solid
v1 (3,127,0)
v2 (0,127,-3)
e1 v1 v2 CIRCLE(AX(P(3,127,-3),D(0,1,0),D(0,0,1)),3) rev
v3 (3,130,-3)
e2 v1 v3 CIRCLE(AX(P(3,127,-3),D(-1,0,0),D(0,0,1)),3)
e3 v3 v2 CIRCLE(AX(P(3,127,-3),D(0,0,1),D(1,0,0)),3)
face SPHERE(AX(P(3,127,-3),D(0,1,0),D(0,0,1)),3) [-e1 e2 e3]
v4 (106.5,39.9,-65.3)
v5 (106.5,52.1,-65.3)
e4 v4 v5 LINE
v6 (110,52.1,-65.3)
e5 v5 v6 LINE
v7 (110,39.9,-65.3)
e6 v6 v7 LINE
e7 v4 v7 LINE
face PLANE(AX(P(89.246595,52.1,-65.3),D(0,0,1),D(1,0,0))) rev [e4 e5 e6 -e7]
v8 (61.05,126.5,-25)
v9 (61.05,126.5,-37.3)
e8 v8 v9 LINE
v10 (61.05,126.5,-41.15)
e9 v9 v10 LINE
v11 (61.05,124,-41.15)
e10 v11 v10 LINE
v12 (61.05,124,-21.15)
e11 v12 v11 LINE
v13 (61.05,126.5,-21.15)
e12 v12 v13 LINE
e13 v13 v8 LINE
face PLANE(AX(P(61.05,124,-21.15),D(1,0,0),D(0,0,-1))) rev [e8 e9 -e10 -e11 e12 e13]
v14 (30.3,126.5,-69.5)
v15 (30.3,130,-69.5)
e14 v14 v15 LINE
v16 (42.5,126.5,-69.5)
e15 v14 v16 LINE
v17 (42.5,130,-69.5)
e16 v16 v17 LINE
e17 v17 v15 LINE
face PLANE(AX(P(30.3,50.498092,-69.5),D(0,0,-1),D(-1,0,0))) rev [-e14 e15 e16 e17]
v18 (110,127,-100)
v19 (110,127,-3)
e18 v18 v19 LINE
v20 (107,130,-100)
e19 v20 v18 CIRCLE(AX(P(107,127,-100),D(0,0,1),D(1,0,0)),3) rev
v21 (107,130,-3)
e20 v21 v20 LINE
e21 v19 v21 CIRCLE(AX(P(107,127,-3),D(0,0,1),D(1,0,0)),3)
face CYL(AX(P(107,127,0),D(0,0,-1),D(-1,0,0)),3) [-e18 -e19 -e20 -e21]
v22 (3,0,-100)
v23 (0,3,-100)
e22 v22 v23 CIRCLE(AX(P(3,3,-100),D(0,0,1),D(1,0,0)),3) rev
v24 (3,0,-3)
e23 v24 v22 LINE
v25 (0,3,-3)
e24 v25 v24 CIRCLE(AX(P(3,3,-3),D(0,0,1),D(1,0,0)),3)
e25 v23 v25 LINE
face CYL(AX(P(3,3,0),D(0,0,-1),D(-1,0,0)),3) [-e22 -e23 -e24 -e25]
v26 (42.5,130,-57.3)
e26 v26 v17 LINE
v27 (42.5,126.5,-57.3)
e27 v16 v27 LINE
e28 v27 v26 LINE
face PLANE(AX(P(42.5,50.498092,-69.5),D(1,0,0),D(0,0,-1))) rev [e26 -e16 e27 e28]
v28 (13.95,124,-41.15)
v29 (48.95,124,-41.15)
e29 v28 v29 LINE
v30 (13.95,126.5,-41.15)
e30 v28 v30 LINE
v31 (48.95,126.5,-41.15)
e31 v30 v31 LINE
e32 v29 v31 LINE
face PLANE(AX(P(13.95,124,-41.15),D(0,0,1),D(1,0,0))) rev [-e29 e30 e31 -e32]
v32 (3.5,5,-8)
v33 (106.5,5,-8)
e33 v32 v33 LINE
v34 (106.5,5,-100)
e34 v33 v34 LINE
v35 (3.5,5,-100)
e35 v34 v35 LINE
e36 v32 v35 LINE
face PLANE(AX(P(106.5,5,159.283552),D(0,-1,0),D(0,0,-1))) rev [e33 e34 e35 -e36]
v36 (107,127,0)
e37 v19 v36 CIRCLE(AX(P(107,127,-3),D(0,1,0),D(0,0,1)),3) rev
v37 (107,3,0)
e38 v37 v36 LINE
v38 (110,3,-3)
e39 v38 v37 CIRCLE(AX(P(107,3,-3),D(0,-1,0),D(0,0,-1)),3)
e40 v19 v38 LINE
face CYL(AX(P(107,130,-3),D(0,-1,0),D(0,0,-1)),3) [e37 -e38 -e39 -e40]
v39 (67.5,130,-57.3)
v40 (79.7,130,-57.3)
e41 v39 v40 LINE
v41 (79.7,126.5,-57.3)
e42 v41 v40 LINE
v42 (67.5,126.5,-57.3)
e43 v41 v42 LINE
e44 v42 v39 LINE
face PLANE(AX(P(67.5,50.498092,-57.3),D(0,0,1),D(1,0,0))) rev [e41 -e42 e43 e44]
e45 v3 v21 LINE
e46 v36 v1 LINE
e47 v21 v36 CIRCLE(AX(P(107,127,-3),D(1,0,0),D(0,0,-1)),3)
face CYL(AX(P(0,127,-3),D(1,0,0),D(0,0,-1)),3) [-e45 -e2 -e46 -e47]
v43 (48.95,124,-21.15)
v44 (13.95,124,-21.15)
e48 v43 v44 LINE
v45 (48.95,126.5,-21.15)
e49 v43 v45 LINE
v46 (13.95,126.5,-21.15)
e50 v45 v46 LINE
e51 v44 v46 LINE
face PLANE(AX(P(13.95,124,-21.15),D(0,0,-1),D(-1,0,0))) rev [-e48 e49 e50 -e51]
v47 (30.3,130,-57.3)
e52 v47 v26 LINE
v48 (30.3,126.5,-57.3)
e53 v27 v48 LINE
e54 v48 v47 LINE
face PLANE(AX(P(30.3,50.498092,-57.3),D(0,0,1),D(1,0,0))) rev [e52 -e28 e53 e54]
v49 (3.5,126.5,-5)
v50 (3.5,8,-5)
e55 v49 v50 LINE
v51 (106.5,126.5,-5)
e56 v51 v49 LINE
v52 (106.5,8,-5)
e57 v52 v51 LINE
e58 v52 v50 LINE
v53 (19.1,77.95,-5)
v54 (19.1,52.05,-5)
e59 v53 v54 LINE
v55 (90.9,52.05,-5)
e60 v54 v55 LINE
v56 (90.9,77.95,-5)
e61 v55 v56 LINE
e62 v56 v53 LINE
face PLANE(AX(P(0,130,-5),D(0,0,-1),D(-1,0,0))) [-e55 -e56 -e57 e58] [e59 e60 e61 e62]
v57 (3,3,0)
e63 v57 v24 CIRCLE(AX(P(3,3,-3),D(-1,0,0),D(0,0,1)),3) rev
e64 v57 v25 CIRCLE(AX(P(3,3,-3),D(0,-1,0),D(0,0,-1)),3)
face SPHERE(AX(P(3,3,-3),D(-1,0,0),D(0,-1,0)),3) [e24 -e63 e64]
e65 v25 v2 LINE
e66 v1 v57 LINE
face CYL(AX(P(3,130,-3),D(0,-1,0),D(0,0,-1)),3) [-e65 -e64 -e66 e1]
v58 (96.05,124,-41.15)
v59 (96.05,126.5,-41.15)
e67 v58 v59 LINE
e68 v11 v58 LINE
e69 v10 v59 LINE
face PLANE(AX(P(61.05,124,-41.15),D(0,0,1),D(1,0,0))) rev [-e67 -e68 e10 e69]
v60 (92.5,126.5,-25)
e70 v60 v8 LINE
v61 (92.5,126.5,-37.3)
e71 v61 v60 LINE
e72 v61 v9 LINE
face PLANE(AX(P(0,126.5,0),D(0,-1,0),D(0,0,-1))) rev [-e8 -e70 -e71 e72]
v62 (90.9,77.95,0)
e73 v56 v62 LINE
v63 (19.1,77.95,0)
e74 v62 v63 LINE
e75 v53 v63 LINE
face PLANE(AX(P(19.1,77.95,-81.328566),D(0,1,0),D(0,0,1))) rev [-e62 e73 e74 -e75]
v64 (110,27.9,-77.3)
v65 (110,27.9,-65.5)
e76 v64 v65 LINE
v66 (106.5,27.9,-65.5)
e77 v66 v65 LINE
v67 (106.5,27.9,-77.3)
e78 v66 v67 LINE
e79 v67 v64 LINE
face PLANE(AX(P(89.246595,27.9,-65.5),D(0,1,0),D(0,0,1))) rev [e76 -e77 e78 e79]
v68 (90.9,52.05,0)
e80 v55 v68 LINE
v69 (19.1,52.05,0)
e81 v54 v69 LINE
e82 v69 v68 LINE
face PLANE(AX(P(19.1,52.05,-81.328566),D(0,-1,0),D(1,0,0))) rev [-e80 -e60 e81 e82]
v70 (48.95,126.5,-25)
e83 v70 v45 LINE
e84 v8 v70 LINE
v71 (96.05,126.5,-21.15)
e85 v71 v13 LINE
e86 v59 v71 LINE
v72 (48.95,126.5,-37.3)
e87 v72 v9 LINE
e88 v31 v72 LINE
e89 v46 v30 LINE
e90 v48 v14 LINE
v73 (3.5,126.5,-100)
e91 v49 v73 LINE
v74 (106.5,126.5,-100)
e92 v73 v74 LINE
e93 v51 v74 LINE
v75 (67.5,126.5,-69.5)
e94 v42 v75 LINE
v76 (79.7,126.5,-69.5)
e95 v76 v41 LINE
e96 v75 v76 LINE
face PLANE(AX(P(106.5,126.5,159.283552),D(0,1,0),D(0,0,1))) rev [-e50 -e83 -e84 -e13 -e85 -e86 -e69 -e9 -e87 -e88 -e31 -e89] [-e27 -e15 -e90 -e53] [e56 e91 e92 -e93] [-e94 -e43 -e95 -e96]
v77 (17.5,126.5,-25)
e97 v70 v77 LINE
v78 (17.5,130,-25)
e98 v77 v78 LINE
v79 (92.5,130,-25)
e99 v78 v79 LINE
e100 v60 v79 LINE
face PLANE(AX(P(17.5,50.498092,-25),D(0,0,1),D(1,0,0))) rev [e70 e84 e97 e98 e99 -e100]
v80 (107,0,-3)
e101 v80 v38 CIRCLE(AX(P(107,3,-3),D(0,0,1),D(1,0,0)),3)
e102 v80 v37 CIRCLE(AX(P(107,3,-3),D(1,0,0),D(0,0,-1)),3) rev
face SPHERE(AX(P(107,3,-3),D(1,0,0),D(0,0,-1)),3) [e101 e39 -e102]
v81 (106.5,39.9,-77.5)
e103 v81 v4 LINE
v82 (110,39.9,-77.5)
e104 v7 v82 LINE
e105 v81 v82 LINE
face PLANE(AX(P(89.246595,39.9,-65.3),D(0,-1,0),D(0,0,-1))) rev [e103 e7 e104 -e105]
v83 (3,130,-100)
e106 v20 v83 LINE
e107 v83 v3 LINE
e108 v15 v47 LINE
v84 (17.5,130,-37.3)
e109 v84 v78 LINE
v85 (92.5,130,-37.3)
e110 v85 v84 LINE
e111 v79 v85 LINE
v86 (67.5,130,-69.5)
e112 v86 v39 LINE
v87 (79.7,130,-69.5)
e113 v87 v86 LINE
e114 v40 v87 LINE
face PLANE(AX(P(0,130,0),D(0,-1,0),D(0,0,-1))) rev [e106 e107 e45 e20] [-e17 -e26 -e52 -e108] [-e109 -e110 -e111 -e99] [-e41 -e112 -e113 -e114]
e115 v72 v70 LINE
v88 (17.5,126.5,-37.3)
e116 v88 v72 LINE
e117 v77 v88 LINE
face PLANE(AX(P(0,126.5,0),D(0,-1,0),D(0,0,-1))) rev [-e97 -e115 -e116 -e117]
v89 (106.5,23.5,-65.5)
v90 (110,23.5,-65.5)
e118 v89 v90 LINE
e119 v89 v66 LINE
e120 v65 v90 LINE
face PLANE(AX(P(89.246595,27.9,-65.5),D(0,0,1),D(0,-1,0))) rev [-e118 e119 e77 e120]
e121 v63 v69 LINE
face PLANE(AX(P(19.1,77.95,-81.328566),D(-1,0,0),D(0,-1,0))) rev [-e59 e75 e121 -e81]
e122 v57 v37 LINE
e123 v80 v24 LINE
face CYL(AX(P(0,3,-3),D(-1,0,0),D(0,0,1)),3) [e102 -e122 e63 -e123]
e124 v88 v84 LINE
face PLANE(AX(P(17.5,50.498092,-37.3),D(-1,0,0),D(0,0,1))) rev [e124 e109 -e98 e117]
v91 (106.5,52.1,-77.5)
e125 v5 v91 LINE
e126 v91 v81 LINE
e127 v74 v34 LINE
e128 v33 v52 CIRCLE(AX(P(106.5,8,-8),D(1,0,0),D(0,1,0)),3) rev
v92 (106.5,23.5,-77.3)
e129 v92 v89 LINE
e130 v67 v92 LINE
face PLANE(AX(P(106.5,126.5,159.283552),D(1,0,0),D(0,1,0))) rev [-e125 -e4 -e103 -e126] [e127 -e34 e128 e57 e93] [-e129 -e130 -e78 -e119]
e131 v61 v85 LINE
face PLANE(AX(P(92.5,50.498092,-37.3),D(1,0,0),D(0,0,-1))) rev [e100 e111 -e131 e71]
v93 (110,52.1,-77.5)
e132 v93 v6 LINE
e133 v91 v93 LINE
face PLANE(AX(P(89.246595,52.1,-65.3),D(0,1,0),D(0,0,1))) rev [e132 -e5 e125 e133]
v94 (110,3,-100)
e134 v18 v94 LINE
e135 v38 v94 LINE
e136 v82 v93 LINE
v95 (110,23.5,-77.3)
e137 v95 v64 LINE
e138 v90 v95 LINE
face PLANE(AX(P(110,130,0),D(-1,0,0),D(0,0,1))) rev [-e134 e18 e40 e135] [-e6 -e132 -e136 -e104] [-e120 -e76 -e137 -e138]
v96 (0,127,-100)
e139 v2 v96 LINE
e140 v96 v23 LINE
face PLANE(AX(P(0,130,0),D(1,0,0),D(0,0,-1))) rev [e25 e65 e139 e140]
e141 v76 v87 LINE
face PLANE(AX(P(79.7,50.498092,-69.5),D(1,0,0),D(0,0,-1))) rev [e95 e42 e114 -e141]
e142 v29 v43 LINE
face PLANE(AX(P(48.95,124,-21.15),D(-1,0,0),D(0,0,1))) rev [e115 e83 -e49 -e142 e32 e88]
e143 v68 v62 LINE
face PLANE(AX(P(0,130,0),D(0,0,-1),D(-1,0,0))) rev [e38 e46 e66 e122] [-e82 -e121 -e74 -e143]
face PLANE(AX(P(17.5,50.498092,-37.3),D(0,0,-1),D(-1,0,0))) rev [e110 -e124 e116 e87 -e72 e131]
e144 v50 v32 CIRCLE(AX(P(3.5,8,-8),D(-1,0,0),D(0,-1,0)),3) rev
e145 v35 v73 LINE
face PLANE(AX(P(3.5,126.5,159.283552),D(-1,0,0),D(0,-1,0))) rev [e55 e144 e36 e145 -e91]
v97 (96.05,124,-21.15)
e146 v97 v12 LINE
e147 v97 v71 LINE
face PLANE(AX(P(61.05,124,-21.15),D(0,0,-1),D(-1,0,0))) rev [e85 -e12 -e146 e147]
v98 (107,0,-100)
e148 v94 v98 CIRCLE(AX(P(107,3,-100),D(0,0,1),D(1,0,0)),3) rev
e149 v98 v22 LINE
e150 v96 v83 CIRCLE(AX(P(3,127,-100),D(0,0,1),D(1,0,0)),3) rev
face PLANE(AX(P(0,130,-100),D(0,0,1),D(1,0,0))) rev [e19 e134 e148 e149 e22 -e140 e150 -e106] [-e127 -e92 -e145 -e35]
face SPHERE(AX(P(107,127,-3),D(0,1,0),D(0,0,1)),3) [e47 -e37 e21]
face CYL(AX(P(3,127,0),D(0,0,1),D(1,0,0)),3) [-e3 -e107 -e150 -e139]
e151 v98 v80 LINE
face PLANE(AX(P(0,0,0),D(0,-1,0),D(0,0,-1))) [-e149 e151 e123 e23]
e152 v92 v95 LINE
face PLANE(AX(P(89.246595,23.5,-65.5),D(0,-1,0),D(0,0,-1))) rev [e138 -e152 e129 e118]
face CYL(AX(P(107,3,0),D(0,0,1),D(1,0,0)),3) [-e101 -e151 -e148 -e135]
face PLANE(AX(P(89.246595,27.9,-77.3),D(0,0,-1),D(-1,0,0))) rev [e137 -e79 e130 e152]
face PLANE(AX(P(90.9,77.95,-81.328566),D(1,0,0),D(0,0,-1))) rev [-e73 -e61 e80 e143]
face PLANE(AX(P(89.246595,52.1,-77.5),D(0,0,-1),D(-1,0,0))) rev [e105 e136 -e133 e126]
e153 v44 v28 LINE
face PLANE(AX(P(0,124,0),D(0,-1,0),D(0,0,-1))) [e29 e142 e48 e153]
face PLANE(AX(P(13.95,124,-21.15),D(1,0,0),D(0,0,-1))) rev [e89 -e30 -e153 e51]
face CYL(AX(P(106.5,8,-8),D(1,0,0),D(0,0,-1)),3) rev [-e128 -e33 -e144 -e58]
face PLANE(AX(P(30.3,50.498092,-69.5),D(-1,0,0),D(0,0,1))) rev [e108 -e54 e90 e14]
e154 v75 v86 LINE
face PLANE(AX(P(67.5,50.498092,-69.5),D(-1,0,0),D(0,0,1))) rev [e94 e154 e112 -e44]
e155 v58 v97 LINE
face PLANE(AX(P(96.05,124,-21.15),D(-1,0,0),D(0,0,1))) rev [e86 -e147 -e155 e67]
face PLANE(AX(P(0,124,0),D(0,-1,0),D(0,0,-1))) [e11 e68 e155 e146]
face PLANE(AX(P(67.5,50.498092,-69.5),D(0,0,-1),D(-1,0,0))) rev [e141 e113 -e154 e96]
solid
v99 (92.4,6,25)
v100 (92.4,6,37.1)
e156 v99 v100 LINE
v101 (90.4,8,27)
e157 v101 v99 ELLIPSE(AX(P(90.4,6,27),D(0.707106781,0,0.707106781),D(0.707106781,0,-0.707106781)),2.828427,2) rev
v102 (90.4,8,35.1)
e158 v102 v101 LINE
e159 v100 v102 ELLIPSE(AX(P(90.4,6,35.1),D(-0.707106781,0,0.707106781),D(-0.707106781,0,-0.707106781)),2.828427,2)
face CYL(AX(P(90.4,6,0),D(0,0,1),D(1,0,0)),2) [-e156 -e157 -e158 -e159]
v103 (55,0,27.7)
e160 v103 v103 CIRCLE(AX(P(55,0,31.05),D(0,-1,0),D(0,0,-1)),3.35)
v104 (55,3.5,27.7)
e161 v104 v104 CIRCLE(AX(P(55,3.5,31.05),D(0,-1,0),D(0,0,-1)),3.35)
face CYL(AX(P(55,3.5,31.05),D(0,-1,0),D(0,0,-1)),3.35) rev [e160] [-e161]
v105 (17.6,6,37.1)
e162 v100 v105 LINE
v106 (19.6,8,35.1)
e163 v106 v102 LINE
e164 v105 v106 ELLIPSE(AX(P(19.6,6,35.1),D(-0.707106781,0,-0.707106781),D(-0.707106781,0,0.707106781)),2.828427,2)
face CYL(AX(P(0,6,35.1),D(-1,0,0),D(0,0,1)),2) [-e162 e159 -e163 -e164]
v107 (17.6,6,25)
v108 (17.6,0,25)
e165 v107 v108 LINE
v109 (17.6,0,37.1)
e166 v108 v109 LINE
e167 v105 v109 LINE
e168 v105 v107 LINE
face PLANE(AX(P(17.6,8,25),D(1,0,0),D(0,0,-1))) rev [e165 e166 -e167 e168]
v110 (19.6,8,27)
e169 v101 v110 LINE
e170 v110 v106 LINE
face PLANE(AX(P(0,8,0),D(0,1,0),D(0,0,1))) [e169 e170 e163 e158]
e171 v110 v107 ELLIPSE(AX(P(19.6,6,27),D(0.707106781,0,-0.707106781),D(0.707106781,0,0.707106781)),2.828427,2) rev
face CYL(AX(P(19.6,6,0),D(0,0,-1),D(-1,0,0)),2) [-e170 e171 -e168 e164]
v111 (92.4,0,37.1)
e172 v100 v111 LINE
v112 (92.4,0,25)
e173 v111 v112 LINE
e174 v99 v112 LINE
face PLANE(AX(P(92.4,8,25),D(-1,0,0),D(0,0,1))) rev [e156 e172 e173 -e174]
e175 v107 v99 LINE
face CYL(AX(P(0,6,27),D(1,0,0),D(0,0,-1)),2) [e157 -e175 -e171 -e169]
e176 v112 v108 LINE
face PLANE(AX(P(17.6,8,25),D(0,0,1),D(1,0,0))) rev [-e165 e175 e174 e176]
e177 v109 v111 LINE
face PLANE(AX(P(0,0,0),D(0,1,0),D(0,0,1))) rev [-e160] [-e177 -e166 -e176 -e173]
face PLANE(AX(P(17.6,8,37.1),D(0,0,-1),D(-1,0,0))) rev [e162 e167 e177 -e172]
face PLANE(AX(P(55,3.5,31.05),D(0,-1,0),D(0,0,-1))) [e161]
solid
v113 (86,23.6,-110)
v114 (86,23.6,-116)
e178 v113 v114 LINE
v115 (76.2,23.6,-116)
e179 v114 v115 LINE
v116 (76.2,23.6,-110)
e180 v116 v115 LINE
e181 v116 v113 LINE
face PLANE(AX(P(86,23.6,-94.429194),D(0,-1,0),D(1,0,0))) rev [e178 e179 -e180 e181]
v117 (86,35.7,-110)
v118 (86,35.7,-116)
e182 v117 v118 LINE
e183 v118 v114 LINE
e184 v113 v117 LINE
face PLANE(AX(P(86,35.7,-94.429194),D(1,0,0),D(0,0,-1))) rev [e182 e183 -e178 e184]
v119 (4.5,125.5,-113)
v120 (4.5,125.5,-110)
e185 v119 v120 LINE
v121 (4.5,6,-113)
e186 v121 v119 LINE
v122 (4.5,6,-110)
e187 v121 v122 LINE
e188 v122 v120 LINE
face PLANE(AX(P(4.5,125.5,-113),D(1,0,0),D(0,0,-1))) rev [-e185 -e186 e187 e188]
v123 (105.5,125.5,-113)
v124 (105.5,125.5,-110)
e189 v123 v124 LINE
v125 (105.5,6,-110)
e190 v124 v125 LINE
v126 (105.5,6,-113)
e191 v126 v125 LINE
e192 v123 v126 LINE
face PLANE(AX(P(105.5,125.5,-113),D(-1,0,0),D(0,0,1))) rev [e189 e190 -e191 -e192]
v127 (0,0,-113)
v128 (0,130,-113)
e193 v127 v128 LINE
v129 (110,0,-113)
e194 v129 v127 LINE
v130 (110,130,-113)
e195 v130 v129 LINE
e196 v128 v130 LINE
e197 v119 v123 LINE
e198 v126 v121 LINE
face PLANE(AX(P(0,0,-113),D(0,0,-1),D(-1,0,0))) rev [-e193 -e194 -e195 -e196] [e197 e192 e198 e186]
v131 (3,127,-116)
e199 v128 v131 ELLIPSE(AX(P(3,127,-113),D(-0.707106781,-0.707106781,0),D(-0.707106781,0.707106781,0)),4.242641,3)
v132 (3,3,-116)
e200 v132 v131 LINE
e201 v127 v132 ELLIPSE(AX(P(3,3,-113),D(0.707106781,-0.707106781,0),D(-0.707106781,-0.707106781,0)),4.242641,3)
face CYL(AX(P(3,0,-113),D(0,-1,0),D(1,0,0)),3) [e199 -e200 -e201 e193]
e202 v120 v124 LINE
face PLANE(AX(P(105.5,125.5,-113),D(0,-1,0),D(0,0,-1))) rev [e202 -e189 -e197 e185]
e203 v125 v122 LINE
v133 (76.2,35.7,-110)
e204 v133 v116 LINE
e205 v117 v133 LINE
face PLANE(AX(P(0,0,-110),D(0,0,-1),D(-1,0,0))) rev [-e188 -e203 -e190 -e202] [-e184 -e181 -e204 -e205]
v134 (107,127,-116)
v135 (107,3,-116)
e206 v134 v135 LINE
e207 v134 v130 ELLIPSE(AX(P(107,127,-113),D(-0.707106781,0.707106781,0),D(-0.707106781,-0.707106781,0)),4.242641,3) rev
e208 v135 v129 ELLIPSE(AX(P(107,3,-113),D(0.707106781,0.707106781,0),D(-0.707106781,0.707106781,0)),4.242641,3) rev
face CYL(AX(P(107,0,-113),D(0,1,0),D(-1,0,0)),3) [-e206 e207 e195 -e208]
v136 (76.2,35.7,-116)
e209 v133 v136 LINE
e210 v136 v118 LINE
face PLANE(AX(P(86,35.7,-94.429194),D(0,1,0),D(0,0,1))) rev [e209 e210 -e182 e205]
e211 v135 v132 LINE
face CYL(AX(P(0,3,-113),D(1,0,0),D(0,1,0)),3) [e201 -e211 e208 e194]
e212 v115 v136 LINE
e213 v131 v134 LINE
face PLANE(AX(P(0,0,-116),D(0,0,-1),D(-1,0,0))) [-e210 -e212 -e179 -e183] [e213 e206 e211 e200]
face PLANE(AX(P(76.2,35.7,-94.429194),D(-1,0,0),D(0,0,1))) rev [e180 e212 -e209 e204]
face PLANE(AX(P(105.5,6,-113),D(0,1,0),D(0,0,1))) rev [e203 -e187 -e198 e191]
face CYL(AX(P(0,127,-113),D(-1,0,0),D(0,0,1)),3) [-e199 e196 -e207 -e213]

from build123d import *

# Parameters (mm, degrees)
SKETCH1_W           = 110
SKETCH1_H           = 100
BOSS_EXTRUDE1_DEPTH = 130
SKETCH2_W           = 103
SKETCH2_H           = 121.5
CUT_EXTRUDE1_DEPTH  = 95
SKETCH3_W           = 71.8
SKETCH3_H           = 25.9
CUT_EXTRUDE2_DEPTH  = 5
SKETCH4_W           = 75
SKETCH4_H           = 12.3
SKETCH4_W_2         = 12.2
SKETCH4_H_2         = 12.2
CUT_EXTRUDE3_DEPTH  = 3.5
SKETCH5_W           = 101
SKETCH5_H           = 119.5
BOSS_EXTRUDE2_DEPTH = 3
SKETCH7_W           = 110
SKETCH7_H           = 130
BOSS_EXTRUDE3_DEPTH = 3
SKETCH8_W           = 11.8
SKETCH8_H           = 4.4
SKETCH8_W_2         = 12.2
SKETCH8_H_2         = 12.2
CUT_EXTRUDE4_DEPTH  = 3.5
SKETCH9_W           = 9.8
SKETCH9_H           = 12.1
CUT_EXTRUDE5_DEPTH  = 6
SKETCH10_W          = 74.8
SKETCH10_H          = 12.1
BOSS_EXTRUDE4_DEPTH = 8
SKETCH11_R          = 3.35
CUT_EXTRUDE6_DEPTH  = 3.5
FILLET1_R           = 3
FILLET2_R           = 3
FILLET3_R           = 2
SKETCH13_W          = 35
SKETCH13_H          = 20
BOSS_EXTRUDE5_DEPTH = 2.5


with BuildPart() as part:
    # Sketch1 → Boss-Extrude1 (new body)
    with BuildSketch(Plane(origin=(0, 0, 0), x_dir=(1, 0, 0), z_dir=(0, 1, 0))):
        with Locations((55, 50)):
            Rectangle(SKETCH1_W, SKETCH1_H)
    extrude(amount=BOSS_EXTRUDE1_DEPTH)

    # Sketch2 → Cut-Extrude1 (cut)
    with BuildSketch(Plane(origin=(0, 0, -100), x_dir=(-1, 0, 0), z_dir=(0, 0, -1))):
        with Locations((-55, 65.75)):
            Rectangle(SKETCH2_W, SKETCH2_H)
    extrude(amount=-CUT_EXTRUDE1_DEPTH, mode=Mode.SUBTRACT)

    # Sketch3 → Cut-Extrude2 (cut)
    with BuildSketch(Plane.XY):
        with Locations((55, 65)):
            Rectangle(SKETCH3_W, SKETCH3_H)
    extrude(amount=-CUT_EXTRUDE2_DEPTH, mode=Mode.SUBTRACT)

    # Sketch4 → Cut-Extrude3 (cut)
    with BuildSketch(Plane(origin=(0, 130, 0), x_dir=(1, 0, 0), z_dir=(0, 1, 0))):
        with Locations((55, 31.15)):
            Rectangle(SKETCH4_W, SKETCH4_H)
        with Locations((73.6, 63.4)):
            Rectangle(SKETCH4_W_2, SKETCH4_H_2)
        with Locations((36.4, 63.4)):
            Rectangle(SKETCH4_W_2, SKETCH4_H_2)
    extrude(amount=-CUT_EXTRUDE3_DEPTH, mode=Mode.SUBTRACT)

    # Sketch8 → Cut-Extrude4 (cut)
    with BuildSketch(Plane(origin=(110, 0, 0), x_dir=(0, 0, -1), z_dir=(1, 0, 0))):
        with Locations((71.4, 25.7)):
            Rectangle(SKETCH8_W, SKETCH8_H)
        with Locations((71.4, 46)):
            Rectangle(SKETCH8_W_2, SKETCH8_H_2)
    extrude(amount=-CUT_EXTRUDE4_DEPTH, mode=Mode.SUBTRACT)

    # Fillet1
    fillet1_edges = [part.edges().sort_by_distance(p)[0] for p in [
        (110, 130, -50),
        (55, 5, -5),
        (0, 130, -50),
        (110, 0, -50),
        (55, 0, 0),
        (0, 0, -50),
        (110, 65, 0),
        (0, 65, 0),
        (55, 130, 0),
    ]]
    fillet(fillet1_edges, radius=FILLET1_R)

    # Sketch13 → Boss-Extrude5 (add)
    with BuildSketch(Plane.XZ.offset(-126.5)):
        with Locations((31.45, -31.15)):
            Rectangle(SKETCH13_W, SKETCH13_H)
        with Locations((78.55, -31.15)):
            Rectangle(SKETCH13_W, SKETCH13_H)
    extrude(amount=BOSS_EXTRUDE5_DEPTH)


with BuildPart() as body_2:
    # Sketch5 → Boss-Extrude2 (new body)
    with BuildSketch(Plane(origin=(0, 0, -110), x_dir=(-1, 0, 0), z_dir=(0, 0, -1))):
        with Locations((-55, 65.75)):
            Rectangle(SKETCH5_W, SKETCH5_H)
    extrude(amount=BOSS_EXTRUDE2_DEPTH)

    # Sketch7 → Boss-Extrude3 (add)
    with BuildSketch(Plane(origin=(0, 0, -113), x_dir=(-1, 0, 0), z_dir=(0, 0, -1))):
        with Locations((-55, 65)):
            Rectangle(SKETCH7_W, SKETCH7_H)
    extrude(amount=BOSS_EXTRUDE3_DEPTH)

    # Sketch9 → Cut-Extrude5 (cut)
    with BuildSketch(Plane(origin=(0, 0, -116), x_dir=(-1, 0, 0), z_dir=(0, 0, -1))):
        with Locations((-81.1, 29.65)):
            Rectangle(SKETCH9_W, SKETCH9_H)
    extrude(amount=-CUT_EXTRUDE5_DEPTH, mode=Mode.SUBTRACT)

    # Fillet2
    fillet2_edges = [body_2.edges().sort_by_distance(p)[0] for p in [
        (55, 0, -116),
        (110, 65, -116),
        (0, 65, -116),
        (55, 130, -116),
    ]]
    fillet(fillet2_edges, radius=FILLET2_R - 0.0001)  # a hair under: the kernel refuses the full size


with BuildPart() as body_3:
    # Sketch10 → Boss-Extrude4 (new body)
    with BuildSketch(Plane(origin=(0, 0, 0), x_dir=(1, 0, 0), z_dir=(0, 1, 0))):
        with Locations((55, -31.05)):
            Rectangle(SKETCH10_W, SKETCH10_H)
    extrude(amount=BOSS_EXTRUDE4_DEPTH)

    # Sketch11 → Cut-Extrude6 (cut)
    with BuildSketch(Plane.XZ):
        with Locations(Location((55, 31.05, 0), (0, 0, 270))):
            Circle(SKETCH11_R)
    extrude(amount=-CUT_EXTRUDE6_DEPTH, mode=Mode.SUBTRACT)

    # Fillet3
    fillet3_edges = [body_3.edges().sort_by_distance(p)[0] for p in [
        (92.4, 8, 31.05),
        (55, 8, 25),
        (17.6, 8, 31.05),
        (55, 8, 37.1),
    ]]
    fillet(fillet3_edges, radius=FILLET3_R)


solid = Compound([part.part, body_2.part, body_3.part])
